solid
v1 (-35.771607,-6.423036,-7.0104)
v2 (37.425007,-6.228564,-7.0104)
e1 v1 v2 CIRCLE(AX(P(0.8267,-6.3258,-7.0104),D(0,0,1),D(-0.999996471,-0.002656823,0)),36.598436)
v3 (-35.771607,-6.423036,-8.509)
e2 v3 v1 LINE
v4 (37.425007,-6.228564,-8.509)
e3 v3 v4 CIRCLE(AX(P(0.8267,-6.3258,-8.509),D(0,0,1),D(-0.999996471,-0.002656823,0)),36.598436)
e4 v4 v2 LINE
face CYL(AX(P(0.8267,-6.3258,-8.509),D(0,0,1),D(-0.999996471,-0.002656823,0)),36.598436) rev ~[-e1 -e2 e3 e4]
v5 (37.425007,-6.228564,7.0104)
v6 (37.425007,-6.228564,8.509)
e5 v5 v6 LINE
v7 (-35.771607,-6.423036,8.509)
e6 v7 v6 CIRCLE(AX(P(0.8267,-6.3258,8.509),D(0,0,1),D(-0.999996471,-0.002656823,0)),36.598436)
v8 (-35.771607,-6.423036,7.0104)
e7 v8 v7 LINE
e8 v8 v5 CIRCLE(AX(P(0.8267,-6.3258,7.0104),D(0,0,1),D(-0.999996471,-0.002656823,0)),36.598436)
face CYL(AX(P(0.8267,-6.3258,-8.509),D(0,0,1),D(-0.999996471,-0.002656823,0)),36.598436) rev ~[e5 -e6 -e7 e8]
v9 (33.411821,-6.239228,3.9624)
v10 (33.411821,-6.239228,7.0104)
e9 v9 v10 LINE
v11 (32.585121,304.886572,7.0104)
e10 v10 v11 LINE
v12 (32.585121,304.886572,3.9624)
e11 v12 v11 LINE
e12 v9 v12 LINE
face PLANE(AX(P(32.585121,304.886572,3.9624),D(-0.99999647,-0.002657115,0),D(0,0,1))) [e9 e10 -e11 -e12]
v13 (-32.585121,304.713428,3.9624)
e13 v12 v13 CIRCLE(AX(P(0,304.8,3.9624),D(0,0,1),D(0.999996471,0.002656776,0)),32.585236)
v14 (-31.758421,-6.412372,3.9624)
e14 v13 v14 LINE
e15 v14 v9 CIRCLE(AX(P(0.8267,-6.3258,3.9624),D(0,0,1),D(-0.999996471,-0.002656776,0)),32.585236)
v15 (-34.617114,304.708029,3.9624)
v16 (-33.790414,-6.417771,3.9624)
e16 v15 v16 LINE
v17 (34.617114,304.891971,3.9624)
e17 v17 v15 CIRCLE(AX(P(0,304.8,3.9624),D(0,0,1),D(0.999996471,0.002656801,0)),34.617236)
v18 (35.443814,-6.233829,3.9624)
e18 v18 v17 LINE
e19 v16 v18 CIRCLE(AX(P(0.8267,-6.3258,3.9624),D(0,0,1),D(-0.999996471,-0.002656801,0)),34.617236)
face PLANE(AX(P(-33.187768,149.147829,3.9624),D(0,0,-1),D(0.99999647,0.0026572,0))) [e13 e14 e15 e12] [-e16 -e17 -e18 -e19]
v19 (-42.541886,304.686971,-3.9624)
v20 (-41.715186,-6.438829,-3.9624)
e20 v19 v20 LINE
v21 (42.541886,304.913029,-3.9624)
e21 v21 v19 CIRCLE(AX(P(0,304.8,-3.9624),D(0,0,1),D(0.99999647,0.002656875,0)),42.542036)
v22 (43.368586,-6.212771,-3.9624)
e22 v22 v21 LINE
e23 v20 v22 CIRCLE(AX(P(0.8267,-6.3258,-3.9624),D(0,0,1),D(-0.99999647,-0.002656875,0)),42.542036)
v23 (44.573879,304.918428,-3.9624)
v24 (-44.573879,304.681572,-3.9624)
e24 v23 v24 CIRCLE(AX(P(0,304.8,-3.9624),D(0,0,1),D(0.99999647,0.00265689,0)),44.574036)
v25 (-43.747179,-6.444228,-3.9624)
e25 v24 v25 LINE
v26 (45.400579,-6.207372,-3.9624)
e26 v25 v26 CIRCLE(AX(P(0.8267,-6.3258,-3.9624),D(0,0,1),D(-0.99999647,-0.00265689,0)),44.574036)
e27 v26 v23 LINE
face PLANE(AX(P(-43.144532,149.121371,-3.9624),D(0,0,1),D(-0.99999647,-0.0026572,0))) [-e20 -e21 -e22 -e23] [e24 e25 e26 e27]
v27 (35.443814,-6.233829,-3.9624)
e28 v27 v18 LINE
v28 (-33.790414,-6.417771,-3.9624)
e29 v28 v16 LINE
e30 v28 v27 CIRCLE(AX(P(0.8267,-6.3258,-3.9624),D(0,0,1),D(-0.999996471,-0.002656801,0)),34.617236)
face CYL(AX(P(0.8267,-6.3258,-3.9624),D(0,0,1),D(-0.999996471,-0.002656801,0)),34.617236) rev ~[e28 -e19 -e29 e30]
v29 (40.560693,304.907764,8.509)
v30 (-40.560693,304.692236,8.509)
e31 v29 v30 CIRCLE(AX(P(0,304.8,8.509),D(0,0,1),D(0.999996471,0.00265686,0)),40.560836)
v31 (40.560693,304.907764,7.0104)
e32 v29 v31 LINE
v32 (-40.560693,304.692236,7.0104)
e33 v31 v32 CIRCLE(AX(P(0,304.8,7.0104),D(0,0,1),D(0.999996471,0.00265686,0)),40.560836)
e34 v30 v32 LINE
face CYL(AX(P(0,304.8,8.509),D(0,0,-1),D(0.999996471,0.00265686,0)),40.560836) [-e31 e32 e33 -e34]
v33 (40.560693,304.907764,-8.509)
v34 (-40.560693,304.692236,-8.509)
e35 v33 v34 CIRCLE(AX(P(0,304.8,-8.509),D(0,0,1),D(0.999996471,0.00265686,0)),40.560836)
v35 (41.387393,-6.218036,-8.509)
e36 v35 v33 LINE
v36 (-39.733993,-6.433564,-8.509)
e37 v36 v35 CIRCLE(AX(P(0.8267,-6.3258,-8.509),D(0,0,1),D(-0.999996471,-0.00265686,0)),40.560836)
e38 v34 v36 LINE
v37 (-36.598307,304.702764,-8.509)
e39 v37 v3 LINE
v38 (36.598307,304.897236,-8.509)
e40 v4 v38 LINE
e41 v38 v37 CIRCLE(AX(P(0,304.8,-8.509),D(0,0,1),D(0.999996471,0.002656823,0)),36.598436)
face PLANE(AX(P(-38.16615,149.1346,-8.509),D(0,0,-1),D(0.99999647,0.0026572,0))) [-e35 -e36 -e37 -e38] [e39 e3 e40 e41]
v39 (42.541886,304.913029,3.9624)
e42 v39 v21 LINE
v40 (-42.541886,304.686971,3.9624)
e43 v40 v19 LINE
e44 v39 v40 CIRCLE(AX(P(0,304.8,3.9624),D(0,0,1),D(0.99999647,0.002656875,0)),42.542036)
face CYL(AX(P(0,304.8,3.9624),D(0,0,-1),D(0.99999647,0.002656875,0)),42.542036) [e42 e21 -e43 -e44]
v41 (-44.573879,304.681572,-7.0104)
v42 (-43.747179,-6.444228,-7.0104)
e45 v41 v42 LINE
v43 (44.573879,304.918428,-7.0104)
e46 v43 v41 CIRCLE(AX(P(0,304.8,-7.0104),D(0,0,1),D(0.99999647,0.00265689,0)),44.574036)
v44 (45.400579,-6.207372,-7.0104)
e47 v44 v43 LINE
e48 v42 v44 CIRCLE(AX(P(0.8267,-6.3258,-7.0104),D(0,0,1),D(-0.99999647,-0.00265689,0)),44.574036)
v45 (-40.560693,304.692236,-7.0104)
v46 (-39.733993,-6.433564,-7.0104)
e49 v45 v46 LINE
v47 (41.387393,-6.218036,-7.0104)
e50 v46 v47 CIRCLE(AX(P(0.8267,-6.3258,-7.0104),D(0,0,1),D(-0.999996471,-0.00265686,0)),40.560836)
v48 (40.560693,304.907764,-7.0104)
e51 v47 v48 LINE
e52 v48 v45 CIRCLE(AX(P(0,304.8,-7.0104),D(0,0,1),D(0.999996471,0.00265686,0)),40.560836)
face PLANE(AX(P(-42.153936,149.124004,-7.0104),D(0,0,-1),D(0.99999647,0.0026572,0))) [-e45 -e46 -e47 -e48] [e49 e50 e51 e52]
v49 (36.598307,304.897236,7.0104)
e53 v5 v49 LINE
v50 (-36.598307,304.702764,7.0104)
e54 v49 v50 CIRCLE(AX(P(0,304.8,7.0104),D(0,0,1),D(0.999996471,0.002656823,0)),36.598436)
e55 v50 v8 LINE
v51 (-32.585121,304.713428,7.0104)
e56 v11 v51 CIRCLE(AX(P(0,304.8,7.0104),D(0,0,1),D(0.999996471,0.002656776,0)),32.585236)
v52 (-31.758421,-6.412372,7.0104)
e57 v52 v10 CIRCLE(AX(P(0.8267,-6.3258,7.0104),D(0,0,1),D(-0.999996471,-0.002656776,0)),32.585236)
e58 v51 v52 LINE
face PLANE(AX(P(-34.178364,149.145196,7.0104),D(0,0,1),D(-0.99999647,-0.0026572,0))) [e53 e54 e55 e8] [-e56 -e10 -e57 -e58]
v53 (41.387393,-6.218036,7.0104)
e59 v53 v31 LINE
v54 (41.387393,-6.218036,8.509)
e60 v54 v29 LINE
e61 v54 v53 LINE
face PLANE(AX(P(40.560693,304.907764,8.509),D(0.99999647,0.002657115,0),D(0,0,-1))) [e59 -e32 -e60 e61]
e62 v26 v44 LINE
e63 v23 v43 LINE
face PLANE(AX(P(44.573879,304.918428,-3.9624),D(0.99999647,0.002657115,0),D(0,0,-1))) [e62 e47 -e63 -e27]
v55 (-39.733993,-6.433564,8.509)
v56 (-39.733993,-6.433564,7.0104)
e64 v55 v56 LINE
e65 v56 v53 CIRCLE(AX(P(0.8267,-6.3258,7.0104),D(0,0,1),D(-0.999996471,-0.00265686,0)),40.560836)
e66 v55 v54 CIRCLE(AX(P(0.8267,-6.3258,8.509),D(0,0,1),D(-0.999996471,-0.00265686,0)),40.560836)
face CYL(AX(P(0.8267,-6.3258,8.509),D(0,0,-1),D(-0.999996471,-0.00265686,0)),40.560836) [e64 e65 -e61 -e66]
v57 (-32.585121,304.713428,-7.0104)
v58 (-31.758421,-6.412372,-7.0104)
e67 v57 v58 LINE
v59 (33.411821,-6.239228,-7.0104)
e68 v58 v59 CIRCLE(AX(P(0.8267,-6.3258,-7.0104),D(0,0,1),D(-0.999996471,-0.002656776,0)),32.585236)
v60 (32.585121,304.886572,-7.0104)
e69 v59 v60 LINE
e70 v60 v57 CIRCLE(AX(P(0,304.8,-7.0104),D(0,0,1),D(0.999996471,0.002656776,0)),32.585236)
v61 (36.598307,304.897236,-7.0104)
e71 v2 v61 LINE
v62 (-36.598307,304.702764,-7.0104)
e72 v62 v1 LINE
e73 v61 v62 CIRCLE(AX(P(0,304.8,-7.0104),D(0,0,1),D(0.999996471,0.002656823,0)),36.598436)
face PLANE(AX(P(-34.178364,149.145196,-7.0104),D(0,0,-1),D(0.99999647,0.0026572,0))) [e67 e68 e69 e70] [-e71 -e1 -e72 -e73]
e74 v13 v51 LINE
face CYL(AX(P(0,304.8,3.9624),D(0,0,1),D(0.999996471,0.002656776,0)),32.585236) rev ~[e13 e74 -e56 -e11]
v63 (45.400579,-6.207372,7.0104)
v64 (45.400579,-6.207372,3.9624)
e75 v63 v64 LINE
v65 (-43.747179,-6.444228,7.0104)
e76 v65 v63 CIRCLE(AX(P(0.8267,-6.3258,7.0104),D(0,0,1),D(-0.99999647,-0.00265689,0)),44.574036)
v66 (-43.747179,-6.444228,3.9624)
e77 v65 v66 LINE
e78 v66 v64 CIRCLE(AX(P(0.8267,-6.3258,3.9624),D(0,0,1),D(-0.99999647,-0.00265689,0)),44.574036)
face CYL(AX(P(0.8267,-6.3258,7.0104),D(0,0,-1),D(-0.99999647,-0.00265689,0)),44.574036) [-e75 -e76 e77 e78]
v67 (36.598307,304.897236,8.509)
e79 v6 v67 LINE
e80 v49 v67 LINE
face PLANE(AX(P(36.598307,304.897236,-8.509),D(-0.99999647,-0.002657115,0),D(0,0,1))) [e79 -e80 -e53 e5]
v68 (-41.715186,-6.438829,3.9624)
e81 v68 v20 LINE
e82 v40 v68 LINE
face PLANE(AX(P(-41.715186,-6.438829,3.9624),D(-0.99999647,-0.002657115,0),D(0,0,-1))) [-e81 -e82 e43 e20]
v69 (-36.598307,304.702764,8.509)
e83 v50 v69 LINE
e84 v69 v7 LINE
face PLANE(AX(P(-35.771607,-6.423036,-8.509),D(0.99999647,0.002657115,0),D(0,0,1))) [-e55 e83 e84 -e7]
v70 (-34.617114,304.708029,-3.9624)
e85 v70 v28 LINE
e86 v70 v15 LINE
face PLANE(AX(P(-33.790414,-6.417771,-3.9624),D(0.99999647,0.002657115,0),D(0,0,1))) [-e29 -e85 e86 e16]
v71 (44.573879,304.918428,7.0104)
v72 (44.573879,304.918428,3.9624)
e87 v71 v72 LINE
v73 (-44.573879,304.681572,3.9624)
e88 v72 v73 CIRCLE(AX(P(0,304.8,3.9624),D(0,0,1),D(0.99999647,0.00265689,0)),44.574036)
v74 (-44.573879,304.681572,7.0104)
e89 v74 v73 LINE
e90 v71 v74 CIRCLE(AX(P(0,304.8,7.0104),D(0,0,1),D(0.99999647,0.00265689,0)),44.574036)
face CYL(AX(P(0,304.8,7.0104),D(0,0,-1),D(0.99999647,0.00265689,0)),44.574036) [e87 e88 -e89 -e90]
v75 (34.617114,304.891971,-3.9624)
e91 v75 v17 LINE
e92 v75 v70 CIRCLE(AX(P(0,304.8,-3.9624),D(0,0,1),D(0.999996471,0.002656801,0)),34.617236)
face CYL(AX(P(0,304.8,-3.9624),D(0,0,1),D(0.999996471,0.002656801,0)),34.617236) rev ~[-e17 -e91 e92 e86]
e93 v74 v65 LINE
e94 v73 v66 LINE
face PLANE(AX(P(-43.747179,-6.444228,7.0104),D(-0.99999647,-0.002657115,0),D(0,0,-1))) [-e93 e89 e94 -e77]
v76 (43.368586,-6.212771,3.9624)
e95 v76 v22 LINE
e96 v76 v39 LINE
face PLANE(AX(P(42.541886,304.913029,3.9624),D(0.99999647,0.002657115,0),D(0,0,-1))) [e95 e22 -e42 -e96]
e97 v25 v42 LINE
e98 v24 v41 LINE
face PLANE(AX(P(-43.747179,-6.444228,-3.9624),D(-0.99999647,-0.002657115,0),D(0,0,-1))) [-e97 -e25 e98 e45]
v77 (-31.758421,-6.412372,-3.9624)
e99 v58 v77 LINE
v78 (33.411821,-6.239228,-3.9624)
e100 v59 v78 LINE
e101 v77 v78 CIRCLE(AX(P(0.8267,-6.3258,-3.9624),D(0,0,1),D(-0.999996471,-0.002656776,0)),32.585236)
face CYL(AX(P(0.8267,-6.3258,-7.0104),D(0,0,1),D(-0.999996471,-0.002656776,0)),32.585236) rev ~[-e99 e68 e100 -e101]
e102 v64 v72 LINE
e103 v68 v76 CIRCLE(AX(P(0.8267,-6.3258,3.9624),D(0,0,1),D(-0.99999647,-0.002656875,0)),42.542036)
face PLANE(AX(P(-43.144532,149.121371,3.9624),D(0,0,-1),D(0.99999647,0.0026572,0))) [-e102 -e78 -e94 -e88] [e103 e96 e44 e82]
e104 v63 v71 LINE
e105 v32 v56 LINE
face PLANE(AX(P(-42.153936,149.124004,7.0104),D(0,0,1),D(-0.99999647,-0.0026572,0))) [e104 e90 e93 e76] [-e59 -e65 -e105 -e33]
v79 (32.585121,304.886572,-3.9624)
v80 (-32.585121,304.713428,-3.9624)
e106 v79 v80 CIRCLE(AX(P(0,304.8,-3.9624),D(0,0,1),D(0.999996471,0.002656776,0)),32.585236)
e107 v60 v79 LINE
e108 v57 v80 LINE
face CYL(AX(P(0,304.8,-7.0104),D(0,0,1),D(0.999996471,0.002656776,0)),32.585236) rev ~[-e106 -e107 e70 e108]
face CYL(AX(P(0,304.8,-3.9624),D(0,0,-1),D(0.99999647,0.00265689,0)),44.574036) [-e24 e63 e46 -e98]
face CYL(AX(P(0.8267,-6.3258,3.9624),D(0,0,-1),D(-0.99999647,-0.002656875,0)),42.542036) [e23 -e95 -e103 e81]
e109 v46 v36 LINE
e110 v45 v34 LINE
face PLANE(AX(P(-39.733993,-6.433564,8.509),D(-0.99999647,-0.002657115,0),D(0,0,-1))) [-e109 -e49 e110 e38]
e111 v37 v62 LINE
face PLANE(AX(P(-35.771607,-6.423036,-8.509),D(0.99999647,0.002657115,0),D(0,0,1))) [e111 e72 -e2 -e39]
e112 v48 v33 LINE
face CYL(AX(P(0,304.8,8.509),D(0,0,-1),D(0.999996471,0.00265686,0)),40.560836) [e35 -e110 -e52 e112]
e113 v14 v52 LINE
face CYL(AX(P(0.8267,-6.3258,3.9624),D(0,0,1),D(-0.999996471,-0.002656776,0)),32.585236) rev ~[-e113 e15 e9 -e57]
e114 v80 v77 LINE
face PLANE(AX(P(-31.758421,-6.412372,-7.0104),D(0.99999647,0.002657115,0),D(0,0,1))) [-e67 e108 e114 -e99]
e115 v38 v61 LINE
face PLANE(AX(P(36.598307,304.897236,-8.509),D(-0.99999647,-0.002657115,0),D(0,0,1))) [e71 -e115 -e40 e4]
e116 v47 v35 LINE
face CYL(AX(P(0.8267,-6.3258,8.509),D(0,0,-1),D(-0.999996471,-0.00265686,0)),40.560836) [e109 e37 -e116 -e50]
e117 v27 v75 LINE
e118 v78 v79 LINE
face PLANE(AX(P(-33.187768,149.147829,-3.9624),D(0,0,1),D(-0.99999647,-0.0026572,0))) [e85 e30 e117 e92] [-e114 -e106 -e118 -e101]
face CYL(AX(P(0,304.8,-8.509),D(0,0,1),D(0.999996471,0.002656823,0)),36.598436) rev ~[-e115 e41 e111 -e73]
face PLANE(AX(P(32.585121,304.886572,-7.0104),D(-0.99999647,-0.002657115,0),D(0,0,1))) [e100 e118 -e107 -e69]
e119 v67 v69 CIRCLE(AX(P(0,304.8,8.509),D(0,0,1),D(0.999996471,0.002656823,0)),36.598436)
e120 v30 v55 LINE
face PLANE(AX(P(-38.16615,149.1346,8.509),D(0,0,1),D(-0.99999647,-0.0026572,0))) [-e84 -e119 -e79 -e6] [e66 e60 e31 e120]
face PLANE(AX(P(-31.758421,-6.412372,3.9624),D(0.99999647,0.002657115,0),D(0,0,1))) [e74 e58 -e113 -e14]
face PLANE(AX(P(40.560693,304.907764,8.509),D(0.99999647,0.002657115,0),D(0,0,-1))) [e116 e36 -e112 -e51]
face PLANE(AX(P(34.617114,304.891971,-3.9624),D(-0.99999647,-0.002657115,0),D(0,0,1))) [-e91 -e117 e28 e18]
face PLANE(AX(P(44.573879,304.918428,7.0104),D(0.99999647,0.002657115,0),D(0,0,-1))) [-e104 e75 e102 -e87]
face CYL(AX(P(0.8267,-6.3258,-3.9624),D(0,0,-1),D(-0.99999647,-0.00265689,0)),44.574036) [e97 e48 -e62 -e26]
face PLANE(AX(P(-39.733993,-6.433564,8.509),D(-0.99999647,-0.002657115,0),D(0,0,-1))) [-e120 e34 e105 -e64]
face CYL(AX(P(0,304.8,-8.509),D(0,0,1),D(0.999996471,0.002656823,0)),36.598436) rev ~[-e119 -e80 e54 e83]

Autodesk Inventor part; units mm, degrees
ref_plane "Work Plane2" through (0.8267, -6.3258, 0) normal (-1, 0, 0) x (0, 0, 1)
ref_plane "Work Plane3" through (0, 304.8, 0) normal (-0.0825793, -0.9965845, 0) x (0, 0, 1)
sketch "Path" plane through (0, 0, 0) normal (0, 0, 1) x (1, 0, 0)
  arc A0 (-37.7528, -6.4283) -> (39.4062, -6.2233) centre (0.8267, -6.3258) ccw
  arc A1 (38.5795, 304.9025) -> (-38.5795, 304.6975) centre (0, 304.8) ccw
  line L0 (38.5795, 304.9025) -> (39.4062, -6.2233)
  line L1 (-37.7528, -6.4283) -> (-38.5795, 304.6975)
  dimension "d31" = 11.9888
ref_plane "Section Plane" through (39.4062, -6.2233, 0) normal (-0.0026572, 0.9999965, 0) x (0, 0, 1)
sketch "Section Sketch" plane through (39.4062, -6.2233, 0) normal (-0.0026572, 0.9999965, 0) x (0, 0, 1)
  line L0 (-8.509, -1.9812) -> (8.509, -1.9812)
  line L1 (8.509, -1.9812) -> (8.509, 1.9812)
  line L2 (8.509, 1.9812) -> (-8.509, 1.9812)
  line L3 (-8.509, 1.9812) -> (-8.509, -1.9812)
  line L4 (-3.9624, -3.9624) -> (3.9624, -3.9624)
  line L5 (3.9624, -3.9624) -> (3.9624, 3.9624)
  line L6 (3.9624, 3.9624) -> (-3.9624, 3.9624)
  line L7 (-3.9624, 3.9624) -> (-3.9624, -3.9624)
  line L8 (-3.9624, 0) -> (3.9624, 0) construction
  line L9 (-7.0104, -5.9944) -> (-3.9624, -5.9944)
  line L10 (-3.9624, -5.9944) -> (-3.9624, 5.9944)
  line L11 (-3.9624, 5.9944) -> (-7.0104, 5.9944)
  line L12 (-7.0104, 5.9944) -> (-7.0104, -5.9944)
  line L13 (3.9624, -5.9944) -> (7.0104, -5.9944)
  line L14 (7.0104, -5.9944) -> (7.0104, 5.9944)
  line L15 (7.0104, 5.9944) -> (3.9624, 5.9944)
  line L16 (3.9624, 5.9944) -> (3.9624, -5.9944)
  line L17 (-8.509, 0) -> (8.509, 0) construction
  point P0 (0, 0)
  point P1 (0, 0)
  dimension "d21" = 3.9624
  dimension "d22" = 7.9248
  dimension "d23" = 7.9248
  dimension "d24" = 3.048
  dimension "d31" = 11.9888
  dimension "d32" = 17.018
sweep "Solid" add profiles "Section Sketch" path "Path"
pattern_of_one "Strand Pattern"
equation "\"d21\" = da_d2"
equation "\"d22\" = da_d1"
equation "\"d23\" = da_b1"
equation "\"d24\" = da_t1 + da_t2"
equation "\"d30\" = da_pt"
equation "\"da_p\" = 12.7"
equation "\"da_b1\" = 7.9248"
equation "\"da_h2\" = 11.9888"
equation "\"da_h3\" = 10.3886"
equation "\"da_d1\" = 7.9248"
equation "\"da_d2\" = 3.9624"
equation "\"da_pt\" = 14.3764"
equation "\"da_b\" = 17.018"
equation "\"da_t1\" = 1.524"
equation "\"da_t2\" = 1.524"
properties part number "Roller Chain"
